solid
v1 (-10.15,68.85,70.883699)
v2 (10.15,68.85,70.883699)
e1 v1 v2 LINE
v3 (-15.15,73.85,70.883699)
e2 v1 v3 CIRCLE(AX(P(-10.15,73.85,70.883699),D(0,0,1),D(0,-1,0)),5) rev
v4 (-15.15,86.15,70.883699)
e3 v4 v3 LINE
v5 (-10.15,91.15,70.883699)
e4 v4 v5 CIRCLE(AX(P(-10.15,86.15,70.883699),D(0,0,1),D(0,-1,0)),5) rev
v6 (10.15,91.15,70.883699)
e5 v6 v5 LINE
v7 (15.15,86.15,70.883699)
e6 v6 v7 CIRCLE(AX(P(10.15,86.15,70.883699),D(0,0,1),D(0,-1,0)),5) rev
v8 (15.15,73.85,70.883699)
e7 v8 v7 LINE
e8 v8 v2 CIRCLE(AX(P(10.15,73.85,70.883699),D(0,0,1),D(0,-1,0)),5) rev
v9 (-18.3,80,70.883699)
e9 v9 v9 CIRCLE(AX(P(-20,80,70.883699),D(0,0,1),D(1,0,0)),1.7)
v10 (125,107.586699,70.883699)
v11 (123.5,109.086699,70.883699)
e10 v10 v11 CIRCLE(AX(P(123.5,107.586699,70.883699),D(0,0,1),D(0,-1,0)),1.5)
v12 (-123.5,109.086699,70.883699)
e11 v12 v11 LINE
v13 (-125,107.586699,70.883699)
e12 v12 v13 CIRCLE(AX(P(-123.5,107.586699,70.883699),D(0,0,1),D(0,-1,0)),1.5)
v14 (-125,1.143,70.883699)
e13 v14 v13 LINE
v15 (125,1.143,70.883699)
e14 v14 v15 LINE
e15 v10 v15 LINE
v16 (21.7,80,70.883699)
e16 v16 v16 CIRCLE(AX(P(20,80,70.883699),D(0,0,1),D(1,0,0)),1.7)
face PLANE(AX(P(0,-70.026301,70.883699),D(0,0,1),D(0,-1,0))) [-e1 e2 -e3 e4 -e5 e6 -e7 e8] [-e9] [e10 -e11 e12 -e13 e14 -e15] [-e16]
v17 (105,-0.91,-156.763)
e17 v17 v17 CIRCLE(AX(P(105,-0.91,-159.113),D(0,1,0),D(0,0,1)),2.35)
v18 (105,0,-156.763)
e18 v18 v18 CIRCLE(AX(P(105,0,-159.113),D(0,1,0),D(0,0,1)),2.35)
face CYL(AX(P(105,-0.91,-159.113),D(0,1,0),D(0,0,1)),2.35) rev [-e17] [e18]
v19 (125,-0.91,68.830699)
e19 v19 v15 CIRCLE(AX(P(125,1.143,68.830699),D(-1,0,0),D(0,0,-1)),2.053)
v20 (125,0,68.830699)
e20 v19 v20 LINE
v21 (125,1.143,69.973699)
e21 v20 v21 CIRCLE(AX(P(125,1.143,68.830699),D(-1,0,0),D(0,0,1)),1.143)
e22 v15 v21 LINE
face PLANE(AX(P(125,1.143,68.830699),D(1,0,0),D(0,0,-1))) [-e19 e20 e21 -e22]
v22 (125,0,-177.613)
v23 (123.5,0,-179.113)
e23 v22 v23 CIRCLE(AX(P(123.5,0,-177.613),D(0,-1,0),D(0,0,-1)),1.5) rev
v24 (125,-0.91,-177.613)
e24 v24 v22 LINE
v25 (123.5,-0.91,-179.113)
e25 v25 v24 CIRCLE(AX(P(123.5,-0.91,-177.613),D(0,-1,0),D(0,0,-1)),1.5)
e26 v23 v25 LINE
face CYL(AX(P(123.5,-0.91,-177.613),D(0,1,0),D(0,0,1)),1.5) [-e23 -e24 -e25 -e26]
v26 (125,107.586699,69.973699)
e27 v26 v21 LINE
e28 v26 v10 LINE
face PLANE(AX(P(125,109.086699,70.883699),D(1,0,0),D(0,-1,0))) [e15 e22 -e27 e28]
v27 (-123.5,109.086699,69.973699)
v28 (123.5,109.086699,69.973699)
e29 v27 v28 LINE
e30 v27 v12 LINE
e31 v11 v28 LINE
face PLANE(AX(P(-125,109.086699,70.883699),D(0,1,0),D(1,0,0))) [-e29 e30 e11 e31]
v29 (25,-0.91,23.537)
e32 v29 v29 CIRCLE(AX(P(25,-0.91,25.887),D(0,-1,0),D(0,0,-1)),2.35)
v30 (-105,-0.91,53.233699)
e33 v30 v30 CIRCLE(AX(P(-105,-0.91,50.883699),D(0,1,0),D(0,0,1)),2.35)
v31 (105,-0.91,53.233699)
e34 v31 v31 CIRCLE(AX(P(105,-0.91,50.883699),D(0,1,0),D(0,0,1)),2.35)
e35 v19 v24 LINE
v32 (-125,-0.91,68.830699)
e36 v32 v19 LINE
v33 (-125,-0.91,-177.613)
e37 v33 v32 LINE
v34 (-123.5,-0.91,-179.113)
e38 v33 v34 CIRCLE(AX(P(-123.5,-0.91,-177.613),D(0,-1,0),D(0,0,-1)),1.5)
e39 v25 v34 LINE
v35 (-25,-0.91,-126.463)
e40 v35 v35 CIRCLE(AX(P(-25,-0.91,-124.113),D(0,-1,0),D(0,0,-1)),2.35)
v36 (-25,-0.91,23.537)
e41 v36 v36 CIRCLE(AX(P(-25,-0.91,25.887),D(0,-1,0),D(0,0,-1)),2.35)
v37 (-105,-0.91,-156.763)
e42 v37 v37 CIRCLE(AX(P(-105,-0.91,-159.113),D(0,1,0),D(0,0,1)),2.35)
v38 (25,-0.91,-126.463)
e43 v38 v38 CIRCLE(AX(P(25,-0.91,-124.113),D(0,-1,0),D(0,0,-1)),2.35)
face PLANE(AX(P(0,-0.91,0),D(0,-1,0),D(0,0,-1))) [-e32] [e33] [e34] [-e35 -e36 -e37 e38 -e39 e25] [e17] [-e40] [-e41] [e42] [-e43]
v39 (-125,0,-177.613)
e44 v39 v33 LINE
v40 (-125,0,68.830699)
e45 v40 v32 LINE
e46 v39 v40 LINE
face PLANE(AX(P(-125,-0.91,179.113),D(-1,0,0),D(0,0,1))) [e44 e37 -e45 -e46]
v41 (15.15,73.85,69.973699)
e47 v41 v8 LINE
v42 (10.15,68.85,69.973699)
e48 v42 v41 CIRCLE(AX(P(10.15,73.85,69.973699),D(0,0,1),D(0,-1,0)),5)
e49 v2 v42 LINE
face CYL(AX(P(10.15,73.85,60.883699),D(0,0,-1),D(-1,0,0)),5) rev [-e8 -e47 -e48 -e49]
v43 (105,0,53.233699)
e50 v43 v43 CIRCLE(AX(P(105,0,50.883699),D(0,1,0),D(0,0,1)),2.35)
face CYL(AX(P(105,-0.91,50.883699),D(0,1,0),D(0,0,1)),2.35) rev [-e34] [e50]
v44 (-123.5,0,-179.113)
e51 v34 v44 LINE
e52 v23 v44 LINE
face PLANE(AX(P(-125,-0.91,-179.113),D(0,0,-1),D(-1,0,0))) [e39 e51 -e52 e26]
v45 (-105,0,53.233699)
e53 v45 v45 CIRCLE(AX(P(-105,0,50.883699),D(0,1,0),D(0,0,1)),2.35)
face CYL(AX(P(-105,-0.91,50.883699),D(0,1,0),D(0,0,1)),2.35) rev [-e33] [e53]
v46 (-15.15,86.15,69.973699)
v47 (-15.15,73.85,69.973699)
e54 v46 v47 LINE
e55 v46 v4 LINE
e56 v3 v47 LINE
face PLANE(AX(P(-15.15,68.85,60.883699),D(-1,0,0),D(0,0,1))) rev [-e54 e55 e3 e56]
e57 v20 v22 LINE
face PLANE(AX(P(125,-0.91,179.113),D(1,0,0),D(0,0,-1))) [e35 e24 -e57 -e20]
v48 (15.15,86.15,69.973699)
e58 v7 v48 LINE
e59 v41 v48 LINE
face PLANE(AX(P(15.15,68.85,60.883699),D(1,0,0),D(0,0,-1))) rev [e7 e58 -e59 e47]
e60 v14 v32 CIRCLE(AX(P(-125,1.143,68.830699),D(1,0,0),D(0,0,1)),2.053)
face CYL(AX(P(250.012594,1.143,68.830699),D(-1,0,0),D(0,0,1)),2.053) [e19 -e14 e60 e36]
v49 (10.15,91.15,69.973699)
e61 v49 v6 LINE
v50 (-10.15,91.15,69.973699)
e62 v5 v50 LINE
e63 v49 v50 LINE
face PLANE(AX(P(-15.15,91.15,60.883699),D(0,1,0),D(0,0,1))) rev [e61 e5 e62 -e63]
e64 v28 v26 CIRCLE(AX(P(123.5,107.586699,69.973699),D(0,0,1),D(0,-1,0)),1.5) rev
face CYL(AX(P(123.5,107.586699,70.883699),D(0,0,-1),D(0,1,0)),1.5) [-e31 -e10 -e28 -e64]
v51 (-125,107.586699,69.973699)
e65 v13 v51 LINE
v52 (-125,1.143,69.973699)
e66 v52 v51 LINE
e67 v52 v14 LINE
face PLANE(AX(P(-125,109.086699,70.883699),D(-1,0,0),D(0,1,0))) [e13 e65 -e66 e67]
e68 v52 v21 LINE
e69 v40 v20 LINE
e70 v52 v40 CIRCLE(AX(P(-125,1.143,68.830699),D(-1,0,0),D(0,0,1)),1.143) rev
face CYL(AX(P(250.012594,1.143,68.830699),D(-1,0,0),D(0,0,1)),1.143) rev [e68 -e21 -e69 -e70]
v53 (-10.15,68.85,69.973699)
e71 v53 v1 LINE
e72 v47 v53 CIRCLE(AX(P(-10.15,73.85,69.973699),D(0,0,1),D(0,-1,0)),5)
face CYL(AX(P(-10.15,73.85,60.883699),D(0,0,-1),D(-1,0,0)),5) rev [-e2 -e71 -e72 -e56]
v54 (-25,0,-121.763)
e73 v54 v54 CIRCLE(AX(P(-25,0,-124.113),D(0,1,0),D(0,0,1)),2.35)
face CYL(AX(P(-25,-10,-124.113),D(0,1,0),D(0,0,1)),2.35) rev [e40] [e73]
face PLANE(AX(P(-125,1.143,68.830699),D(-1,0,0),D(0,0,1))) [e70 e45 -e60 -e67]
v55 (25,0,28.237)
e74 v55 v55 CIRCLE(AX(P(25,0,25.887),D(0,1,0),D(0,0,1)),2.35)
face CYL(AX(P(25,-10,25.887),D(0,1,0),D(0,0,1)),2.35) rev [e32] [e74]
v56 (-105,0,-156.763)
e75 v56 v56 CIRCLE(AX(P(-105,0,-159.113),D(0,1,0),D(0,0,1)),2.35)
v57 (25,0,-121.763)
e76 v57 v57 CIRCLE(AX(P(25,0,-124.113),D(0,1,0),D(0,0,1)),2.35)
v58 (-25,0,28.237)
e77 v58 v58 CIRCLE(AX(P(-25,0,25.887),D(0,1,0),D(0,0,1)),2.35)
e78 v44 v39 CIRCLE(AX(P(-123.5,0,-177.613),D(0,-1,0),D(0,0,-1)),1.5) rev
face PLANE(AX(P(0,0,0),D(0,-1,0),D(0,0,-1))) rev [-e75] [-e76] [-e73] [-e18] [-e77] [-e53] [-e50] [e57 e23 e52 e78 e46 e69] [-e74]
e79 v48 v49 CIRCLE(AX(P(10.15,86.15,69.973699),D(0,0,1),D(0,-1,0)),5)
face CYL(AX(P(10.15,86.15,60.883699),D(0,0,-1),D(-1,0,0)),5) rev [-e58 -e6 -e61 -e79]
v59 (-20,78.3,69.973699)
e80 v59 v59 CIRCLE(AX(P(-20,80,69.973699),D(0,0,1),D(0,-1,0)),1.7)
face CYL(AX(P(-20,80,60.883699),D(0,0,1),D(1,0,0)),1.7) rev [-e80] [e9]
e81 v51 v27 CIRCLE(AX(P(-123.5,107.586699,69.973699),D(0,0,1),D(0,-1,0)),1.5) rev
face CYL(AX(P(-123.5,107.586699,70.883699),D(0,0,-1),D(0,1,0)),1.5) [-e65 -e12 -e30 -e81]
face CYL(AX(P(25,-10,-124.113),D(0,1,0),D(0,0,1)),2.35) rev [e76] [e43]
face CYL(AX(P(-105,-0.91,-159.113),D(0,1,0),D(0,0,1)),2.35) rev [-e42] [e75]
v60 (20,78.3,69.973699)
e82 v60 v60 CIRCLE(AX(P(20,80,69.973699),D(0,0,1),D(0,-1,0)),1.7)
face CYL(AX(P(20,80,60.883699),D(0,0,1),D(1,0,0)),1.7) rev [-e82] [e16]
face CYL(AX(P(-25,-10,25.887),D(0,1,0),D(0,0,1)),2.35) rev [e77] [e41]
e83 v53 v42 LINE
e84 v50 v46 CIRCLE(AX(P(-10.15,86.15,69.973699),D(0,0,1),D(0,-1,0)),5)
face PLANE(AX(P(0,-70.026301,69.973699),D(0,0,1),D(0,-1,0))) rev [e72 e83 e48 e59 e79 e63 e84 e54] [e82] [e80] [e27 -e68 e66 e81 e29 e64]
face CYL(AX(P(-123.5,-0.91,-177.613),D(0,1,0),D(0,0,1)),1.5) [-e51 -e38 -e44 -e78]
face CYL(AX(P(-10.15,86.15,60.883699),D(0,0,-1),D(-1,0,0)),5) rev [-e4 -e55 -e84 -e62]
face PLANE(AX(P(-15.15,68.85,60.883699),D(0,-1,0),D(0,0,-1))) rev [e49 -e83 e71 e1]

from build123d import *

# Parameters (mm, degrees)
SKETCH1_W              = 250
SKETCH1_H              = 358.226
BASE_FLANGE1_DEPTH     = 0.91
SKETCHED_START         = -125
SKETCHED_BEND1_DEPTH   = 250
SKETCHED_BEND1_2_DEPTH = 250
SKETCH10_R             = 2.35
CUT_EXTRUDE1_DEPTH     = 0.91
FILLET1_R              = 1.5
SKETCH11_R             = 2.35
CUT_EXTRUDE2_DEPTH     = 10
SKETCH12_R             = 1.7
SKETCH12_W             = 30.3
SKETCH12_H             = 22.3
CUT_EXTRUDE3_DEPTH     = 10
FILLET2_R              = 5


# Read off the part's stored shape, not the designer's step: Sketched Bend1
# Sheet-metal steps are written as plain solids
with BuildPart() as part:
    # Sketch1 → Base-Flange1 (new body)
    with BuildSketch(Plane(origin=(0, 0, 0), x_dir=(1, 0, 0), z_dir=(0, 1, 0))):
        Rectangle(SKETCH1_W, SKETCH1_H)
    extrude(amount=-BASE_FLANGE1_DEPTH)

    # Sketched Bend1 outline → Sketched Bend1 (cut)
    with BuildSketch(Plane.YZ.offset(SKETCHED_START)):
        with BuildLine():
            ThreePointArc((-0.91, 68.830699214), (-0.668268616, 69.797195464), (0, 70.536090665))
            Line((0, 70.536090665), (0, 179.113))
            Line((0, 179.113), (-0.91, 179.113))
            Line((-0.91, 179.113), (-0.91, 68.830699214))
        make_face()
    extrude(amount=SKETCHED_BEND1_DEPTH, mode=Mode.SUBTRACT)

    # Sketched Bend1 2 outline → Sketched Bend1 2 (add)
    with BuildSketch(Plane.YZ.offset(SKETCHED_START)):
        with BuildLine():
            Line((109.086699214, 69.973699214), (109.086699214, 70.883699214))
            Line((109.086699214, 70.883699214), (1.143, 70.883699214))
            ThreePointArc((1.143, 70.883699214), (0.545655731, 70.794875587), (0, 70.536090665))
            Line((0, 70.536090665), (0, 68.830699214))
            ThreePointArc((0, 68.830699214), (0.334776949, 69.638922265), (1.143, 69.973699214))
            Line((1.143, 69.973699214), (109.086699214, 69.973699214))
        make_face()
    extrude(amount=SKETCHED_BEND1_2_DEPTH)

    # Sketch10 → Cut-Extrude1 (cut)
    with BuildSketch(Plane(origin=(0, 0, 0), x_dir=(1, 0, 0), z_dir=(0, 1, 0))):
        with Locations(Location((-105, 159.113, 0), (0, 0, 270))):
            Circle(SKETCH10_R)
        with Locations(Location((105, 159.113, 0), (0, 0, 270))):
            Circle(SKETCH10_R)
        with Locations(Location((105, -50.883699214, 0), (0, 0, 270))):
            Circle(SKETCH10_R)
        with Locations(Location((-105, -50.883699214, 0), (0, 0, 270))):
            Circle(SKETCH10_R)
    extrude(amount=-CUT_EXTRUDE1_DEPTH, mode=Mode.SUBTRACT)

    # Fillet1
    fillet1_edges = [part.edges().sort_by_distance(p)[0] for p in [
        (-125, -0.455, -179.113),
        (125, -0.455, -179.113),
        (125, 109.086699214, 70.428699214),
        (-125, 109.086699214, 70.428699214),
    ]]
    fillet(fillet1_edges, radius=FILLET1_R)

    # Sketch11 → Cut-Extrude2 (cut)
    with BuildSketch(Plane(origin=(0, 0, 0), x_dir=(1, 0, 0), z_dir=(0, 1, 0))):
        with Locations(Location((25, 124.113, 0), (0, 0, 270))):
            Circle(SKETCH11_R)
        with Locations(Location((-25, 124.113, 0), (0, 0, 270))):
            Circle(SKETCH11_R)
        with Locations(Location((-25, -25.887, 0), (0, 0, 270))):
            Circle(SKETCH11_R)
        with Locations(Location((25, -25.887, 0), (0, 0, 270))):
            Circle(SKETCH11_R)
    extrude(amount=-CUT_EXTRUDE2_DEPTH, mode=Mode.SUBTRACT)

    # Sketch12 → Cut-Extrude3 (cut)
    with BuildSketch(Plane.XY.offset(70.883699214)):
        with Locations((-20, 80)):
            Circle(SKETCH12_R)
        with Locations((20, 80)):
            Circle(SKETCH12_R)
        with Locations((0, 80)):
            Rectangle(SKETCH12_W, SKETCH12_H)
    extrude(amount=-CUT_EXTRUDE3_DEPTH, mode=Mode.SUBTRACT)

    # Fillet2
    fillet2_edges = [part.edges().sort_by_distance(p)[0] for p in [
        (15.15, 91.15, 70.428699214),
        (15.15, 68.85, 70.428699214),
        (-15.15, 68.85, 70.428699214),
        (-15.15, 91.15, 70.428699214),
    ]]
    fillet(fillet2_edges, radius=FILLET2_R)


solid = part.part
